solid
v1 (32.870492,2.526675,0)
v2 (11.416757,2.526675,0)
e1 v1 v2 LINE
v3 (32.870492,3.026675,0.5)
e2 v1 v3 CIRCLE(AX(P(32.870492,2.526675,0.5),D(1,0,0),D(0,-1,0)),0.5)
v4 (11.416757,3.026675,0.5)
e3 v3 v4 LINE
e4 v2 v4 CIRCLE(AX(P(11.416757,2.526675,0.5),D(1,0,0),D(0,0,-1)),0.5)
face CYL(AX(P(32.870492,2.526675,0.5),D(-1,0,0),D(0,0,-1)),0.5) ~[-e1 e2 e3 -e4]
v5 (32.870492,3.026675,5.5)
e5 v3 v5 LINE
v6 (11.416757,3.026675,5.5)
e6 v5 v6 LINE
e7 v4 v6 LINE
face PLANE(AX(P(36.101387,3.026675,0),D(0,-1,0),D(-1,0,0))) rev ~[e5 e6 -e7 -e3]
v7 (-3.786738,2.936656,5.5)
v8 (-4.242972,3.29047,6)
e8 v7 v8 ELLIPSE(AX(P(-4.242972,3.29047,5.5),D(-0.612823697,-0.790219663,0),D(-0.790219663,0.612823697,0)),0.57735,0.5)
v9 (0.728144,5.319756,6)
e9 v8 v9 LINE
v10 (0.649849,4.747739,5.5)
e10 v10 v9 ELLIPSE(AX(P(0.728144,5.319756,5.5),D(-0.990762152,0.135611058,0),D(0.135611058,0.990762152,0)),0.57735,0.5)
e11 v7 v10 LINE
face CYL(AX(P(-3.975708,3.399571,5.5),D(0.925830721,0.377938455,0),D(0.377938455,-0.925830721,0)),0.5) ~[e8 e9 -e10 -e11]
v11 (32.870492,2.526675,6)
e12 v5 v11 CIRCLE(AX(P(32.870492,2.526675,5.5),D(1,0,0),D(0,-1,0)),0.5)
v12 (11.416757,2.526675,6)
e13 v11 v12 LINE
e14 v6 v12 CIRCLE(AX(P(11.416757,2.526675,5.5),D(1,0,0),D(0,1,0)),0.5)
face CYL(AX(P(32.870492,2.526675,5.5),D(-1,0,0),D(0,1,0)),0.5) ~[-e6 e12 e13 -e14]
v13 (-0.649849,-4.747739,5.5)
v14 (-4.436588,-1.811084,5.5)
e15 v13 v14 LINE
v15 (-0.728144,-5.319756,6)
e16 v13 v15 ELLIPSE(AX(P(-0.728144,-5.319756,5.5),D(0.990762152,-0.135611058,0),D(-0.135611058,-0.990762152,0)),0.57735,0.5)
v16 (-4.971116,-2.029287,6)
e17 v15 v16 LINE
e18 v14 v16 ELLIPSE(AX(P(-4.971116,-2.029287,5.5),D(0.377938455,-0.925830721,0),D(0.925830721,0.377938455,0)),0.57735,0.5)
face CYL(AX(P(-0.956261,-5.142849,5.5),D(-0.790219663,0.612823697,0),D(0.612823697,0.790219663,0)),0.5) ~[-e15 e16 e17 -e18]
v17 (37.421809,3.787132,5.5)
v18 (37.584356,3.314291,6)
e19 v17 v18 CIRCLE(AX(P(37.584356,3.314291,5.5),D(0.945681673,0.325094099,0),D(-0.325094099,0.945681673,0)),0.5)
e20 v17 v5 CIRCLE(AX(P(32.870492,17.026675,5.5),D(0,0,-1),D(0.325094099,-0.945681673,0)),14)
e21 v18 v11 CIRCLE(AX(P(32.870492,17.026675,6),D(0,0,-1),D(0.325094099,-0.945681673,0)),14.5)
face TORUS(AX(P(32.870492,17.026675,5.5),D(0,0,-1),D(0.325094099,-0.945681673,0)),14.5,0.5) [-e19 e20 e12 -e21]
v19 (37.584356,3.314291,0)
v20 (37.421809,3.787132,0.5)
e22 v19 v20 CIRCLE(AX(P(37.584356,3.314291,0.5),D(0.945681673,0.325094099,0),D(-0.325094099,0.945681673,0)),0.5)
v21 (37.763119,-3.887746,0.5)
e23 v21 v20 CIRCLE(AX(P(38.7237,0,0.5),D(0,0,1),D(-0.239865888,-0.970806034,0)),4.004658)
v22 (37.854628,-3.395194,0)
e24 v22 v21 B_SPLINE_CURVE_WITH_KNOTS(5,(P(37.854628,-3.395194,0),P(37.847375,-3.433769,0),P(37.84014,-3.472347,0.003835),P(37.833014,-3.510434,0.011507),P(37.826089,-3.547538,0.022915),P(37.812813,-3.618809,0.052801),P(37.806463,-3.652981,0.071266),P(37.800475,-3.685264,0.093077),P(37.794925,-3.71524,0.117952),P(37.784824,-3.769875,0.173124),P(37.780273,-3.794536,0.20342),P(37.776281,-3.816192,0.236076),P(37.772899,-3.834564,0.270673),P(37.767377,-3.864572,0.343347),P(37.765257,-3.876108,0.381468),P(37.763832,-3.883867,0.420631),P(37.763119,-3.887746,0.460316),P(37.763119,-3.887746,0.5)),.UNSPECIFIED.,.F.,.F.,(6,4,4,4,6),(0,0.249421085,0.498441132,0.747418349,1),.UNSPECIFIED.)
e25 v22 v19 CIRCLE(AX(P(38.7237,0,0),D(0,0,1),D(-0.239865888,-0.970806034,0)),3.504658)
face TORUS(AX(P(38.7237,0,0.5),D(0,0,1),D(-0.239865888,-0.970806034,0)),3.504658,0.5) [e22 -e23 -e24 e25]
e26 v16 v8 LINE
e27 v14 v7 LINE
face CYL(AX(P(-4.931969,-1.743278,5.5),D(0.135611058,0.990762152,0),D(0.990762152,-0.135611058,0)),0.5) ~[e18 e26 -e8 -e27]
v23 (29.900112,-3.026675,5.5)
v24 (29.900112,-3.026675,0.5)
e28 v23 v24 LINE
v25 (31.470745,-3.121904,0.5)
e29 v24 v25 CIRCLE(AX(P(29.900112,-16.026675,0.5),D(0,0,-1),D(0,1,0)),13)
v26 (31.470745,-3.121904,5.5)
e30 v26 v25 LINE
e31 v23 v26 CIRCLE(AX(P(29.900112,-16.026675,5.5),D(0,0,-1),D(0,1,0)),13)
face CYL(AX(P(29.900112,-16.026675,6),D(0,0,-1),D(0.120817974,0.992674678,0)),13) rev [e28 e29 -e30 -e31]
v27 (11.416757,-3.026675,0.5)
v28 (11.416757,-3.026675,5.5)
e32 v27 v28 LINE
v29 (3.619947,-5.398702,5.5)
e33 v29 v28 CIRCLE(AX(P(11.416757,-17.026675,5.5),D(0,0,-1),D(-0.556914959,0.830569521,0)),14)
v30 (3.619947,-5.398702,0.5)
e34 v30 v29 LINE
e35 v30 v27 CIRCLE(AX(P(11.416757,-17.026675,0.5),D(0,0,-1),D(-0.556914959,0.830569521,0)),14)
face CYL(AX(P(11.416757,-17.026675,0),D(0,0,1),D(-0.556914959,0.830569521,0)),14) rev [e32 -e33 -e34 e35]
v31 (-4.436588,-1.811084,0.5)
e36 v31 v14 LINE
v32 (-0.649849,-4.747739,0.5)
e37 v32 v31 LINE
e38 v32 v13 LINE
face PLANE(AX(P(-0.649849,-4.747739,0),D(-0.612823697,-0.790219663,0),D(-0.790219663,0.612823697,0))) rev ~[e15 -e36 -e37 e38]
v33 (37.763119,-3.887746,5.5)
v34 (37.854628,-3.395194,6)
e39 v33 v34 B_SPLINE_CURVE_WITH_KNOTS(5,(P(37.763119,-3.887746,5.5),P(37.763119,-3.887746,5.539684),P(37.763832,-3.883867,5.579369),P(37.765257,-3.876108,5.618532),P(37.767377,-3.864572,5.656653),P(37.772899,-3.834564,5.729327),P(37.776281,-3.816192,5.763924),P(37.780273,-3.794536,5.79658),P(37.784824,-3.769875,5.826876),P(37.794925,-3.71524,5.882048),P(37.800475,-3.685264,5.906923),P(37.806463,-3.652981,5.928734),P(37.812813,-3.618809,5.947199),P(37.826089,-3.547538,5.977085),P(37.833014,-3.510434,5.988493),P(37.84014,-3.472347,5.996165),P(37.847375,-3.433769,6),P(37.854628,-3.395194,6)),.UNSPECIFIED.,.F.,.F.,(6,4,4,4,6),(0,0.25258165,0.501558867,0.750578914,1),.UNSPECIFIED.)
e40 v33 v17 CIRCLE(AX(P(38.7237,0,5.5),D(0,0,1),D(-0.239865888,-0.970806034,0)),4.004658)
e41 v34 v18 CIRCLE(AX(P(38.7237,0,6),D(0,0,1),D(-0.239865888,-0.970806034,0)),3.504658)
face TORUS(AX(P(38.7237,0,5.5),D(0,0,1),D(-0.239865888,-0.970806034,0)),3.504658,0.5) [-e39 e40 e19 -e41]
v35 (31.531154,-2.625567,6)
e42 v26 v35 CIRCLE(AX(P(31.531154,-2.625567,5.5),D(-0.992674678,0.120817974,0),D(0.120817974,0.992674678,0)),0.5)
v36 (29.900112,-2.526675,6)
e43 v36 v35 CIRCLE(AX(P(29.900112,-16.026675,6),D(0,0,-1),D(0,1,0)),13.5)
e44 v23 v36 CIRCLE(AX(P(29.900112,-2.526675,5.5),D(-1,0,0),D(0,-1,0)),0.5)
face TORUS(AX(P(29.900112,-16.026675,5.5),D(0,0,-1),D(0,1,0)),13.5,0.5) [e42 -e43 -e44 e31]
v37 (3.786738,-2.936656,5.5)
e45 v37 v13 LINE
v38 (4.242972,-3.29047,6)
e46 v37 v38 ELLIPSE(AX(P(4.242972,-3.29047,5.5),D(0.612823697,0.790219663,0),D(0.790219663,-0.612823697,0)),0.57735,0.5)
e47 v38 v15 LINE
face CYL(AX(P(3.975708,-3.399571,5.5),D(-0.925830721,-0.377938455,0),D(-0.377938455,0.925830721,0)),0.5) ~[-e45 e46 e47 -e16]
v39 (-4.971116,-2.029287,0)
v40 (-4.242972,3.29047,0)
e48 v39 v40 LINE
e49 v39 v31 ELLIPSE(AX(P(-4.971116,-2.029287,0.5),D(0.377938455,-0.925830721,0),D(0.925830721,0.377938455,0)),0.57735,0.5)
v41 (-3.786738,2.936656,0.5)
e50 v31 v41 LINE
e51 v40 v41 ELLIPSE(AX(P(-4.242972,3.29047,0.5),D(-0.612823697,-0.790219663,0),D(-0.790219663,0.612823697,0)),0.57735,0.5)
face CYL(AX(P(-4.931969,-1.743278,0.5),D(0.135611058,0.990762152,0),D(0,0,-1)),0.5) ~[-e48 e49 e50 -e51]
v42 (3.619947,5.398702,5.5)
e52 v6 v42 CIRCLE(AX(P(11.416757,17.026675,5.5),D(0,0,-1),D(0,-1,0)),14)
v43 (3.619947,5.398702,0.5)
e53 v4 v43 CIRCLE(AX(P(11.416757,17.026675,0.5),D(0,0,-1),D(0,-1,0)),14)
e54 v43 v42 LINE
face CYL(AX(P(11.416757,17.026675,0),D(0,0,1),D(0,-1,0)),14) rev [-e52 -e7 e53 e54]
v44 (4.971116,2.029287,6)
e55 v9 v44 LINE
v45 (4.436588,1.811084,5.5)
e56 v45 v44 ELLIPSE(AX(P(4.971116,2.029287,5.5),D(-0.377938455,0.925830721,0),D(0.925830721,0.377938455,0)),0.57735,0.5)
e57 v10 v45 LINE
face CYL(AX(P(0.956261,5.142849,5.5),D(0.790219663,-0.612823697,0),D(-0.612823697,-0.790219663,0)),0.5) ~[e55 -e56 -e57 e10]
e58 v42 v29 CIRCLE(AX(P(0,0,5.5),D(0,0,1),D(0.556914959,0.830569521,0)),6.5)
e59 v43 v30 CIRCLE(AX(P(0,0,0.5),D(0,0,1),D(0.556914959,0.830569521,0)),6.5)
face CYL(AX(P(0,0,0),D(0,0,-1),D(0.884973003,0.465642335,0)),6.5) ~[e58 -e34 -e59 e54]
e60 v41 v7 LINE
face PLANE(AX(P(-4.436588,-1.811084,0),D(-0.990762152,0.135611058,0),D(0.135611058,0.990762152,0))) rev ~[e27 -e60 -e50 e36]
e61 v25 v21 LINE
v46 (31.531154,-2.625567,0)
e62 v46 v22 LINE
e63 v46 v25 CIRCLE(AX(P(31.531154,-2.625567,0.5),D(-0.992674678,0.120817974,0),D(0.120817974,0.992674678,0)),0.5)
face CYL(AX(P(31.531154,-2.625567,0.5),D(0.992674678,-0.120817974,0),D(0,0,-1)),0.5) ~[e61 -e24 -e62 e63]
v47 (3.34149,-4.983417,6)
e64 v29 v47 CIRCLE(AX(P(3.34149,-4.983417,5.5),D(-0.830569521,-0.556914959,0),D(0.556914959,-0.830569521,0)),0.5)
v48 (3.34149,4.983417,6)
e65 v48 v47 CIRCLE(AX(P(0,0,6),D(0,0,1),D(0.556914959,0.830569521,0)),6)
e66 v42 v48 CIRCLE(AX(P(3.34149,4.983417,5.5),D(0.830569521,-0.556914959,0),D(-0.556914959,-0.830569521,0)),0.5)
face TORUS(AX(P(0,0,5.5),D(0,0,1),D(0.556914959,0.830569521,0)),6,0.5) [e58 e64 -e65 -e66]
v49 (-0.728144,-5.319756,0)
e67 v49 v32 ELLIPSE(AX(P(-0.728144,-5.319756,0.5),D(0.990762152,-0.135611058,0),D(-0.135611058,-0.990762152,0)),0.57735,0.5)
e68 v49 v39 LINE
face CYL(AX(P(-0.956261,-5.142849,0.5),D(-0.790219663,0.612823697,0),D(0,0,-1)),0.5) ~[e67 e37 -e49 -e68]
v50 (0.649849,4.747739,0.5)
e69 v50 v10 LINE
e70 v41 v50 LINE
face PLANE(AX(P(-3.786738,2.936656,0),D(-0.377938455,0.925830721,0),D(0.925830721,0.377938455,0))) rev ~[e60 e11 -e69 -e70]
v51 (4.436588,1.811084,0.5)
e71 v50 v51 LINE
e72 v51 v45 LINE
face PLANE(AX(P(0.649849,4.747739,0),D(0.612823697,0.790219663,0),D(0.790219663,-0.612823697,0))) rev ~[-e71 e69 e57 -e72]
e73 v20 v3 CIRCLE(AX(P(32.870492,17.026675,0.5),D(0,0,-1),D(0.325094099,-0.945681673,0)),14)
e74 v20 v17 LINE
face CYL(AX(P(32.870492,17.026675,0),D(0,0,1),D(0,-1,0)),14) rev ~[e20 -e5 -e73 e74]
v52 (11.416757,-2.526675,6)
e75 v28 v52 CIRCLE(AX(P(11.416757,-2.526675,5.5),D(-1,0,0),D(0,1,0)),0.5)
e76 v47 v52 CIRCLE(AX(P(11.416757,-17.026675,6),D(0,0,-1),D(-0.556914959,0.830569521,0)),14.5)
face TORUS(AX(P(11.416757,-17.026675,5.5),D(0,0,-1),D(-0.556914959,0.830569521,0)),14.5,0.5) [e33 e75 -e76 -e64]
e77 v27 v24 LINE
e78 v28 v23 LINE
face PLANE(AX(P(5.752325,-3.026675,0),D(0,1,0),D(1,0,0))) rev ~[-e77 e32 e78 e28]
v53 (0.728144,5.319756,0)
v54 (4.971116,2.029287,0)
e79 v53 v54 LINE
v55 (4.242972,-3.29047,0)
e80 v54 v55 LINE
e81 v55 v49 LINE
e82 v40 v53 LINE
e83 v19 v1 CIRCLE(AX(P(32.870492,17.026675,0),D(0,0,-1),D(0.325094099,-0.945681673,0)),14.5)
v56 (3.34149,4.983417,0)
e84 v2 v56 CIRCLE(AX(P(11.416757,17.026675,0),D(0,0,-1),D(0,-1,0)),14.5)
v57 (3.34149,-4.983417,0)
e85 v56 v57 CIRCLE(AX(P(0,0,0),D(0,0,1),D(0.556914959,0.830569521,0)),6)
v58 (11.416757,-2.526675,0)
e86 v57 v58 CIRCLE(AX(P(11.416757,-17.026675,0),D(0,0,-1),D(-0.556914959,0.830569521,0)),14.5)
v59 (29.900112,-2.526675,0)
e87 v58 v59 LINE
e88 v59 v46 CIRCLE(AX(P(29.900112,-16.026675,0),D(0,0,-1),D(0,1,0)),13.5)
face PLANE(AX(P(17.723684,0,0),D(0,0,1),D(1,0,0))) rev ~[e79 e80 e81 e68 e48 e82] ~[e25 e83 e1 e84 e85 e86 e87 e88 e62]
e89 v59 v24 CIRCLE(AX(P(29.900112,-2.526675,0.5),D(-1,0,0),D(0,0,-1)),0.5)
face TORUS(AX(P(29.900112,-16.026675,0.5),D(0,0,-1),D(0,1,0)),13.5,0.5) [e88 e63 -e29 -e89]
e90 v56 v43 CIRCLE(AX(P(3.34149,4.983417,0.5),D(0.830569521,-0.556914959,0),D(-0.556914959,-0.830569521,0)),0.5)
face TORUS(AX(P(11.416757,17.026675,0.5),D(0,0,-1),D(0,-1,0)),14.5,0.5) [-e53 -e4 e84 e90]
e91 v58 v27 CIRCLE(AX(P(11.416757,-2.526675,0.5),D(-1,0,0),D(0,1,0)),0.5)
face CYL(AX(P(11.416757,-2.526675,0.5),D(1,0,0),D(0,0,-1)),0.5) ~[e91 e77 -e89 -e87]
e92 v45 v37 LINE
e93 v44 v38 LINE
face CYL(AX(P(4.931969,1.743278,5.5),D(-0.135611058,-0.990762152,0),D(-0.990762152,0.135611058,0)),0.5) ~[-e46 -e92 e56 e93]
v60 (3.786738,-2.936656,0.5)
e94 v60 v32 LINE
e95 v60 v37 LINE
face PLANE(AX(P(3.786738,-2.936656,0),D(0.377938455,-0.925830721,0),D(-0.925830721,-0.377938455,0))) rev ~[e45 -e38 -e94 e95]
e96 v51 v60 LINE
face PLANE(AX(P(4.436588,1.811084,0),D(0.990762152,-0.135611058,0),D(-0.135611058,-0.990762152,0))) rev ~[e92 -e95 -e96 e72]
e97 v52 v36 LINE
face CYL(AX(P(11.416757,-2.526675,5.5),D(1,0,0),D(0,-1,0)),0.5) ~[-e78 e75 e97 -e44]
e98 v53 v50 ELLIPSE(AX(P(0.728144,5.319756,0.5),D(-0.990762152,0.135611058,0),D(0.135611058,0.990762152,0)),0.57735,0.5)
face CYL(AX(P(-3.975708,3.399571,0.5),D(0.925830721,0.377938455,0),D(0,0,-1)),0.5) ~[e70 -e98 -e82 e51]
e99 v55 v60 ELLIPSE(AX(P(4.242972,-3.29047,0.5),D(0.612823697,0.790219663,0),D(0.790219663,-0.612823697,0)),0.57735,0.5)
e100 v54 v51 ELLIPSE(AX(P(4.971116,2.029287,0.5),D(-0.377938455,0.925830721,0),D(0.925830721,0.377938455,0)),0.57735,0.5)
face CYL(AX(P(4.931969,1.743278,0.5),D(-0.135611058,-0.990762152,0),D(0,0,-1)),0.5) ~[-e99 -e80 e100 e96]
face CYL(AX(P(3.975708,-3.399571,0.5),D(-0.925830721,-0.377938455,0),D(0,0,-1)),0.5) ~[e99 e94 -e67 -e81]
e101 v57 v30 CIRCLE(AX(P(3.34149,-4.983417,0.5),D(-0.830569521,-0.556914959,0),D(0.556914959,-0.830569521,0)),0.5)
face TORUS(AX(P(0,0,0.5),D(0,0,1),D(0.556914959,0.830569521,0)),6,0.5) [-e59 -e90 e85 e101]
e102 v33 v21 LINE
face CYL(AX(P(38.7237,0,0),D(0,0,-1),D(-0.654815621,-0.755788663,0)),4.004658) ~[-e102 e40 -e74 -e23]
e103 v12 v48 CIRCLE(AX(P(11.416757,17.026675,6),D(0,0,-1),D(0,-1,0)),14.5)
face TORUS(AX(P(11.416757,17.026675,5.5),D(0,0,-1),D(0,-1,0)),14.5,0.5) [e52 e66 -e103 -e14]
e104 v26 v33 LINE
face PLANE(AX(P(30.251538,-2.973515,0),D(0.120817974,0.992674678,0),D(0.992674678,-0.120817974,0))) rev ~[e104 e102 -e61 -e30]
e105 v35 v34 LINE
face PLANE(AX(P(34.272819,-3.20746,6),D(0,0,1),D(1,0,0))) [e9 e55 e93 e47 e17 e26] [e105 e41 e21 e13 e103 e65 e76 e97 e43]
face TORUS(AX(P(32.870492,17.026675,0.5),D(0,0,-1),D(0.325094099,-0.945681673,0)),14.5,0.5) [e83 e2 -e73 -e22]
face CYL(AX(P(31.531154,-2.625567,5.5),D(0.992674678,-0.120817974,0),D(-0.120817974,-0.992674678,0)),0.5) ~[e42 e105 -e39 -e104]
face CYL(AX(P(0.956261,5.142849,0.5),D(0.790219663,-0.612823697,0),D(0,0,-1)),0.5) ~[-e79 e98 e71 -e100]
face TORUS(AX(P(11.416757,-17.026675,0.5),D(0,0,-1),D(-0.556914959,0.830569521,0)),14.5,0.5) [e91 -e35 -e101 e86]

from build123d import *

# Parameters (mm, degrees)
F1_DEPTH    = 6
F2_R        = 14
F3_T1_DEPTH = 6
F4_R        = 13
F5_R        = 0.5


# Not quite as in the source:
# - a fillet or chamfer that OpenCascade refuses, or shapes differently, is made with other operations: its cross-section is extruded or revolved along the edge and cut away or added


with BuildPart() as f1:
    # F0 (on Top) → F1 (new body)
    with BuildSketch(Plane.XY):
        with BuildLine():
            Line((36.1013870801, 3.026675175), (5.7523245202, 3.026675175))
            ThreePointArc((5.7523245202, 3.026675175), (-6.5, 0), (5.7523245202, -3.026675175))
            Line((5.7523245202, -3.026675175), (36.1013870801, -3.026675175))
            ThreePointArc((36.1013870801, -3.026675175), (42.7283578295, 0), (36.1013870801, 3.026675175))
        make_face()
        Polygon((-3.7867383436, 2.9366555893), (0.6498491707, 4.7477393977), (4.4365875143, 1.8110838084), (3.7867383436, -2.9366555893), (-0.6498491707, -4.7477393977), (-4.4365875143, -1.8110838084), align=None, mode=Mode.SUBTRACT)
    extrude(amount=F1_DEPTH)

    # F2
    f2_edges = [f1.edges().sort_by_distance(p)[0] for p in [
        (5.752325, -3.026675, 3),
        (5.752325, 3.026675, 3),
        (36.101387, 3.026675, 3),
    ]]
    fillet(f2_edges, radius=F2_R)

    # F3: chamfer of 11 on 1 edges, made by hand

    # F3_s2 → F3_t1 (join)
    with BuildSketch(Plane.XY):
        with BuildLine():
            Line((30.2515384912, -2.9735152662), (38.1998957411, -3.9409061384))
            Line((38.1998957411, -3.9409061384), (38.2526662364, -3.7273288109))
            ThreePointArc((38.2526662364, -3.7273288109), (37.1662038799, -3.4493250658), (36.2454465167, -2.8604016692))
            Line((36.2454465167, -2.8604016692), (36.1013870801, -2.806675175))
            ThreePointArc((36.1013870801, -2.806675175), (33.1764627857, -2.806675175), (30.2515384912, -2.7535152662))
            Line((30.2515384912, -2.7535152662), (30.2515384912, -2.9735152662))
        make_face()
    extrude(amount=F3_T1_DEPTH)

    # F4
    f4_edges = [f1.edges().sort_by_distance(p)[0] for p in [
        (30.688315, -3.026675, 3),
    ]]
    fillet(f4_edges, radius=F4_R)

    # F5
    f5_edges = [f1.edges().sort_by_distance(p)[0] for p in [
        (20.658434, -3.026675, 0),
        (30.686871, -3.050504, 0),
        (7.341933, -3.632803, 0),
        (34.616932, -3.504825, 0),
        (-6.5, 0, 0),
        (42.724404, 0.177915, 0),
        (7.341933, 3.632803, 0),
        (35.177697, 3.218098, 0),
        (22.143624, 3.026675, 0),
        (-4.111663, 0.562786, 0),
        (-1.568445, 3.842197, 0),
        (2.543218, 3.279412, 0),
        (4.111663, -0.562786, 0),
        (1.568445, -3.842197, 0),
        (-2.543218, -3.279412, 0),
        (20.658434, -3.026675, 6),
        (30.686871, -3.050504, 6),
        (7.341933, -3.632803, 6),
        (34.616932, -3.504825, 6),
        (-6.5, 0, 6),
        (42.724404, 0.177915, 6),
        (7.341933, 3.632803, 6),
        (35.177697, 3.218098, 6),
        (22.143624, 3.026675, 6),
        (-4.111663, 0.562786, 6),
        (-1.568445, 3.842197, 6),
        (2.543218, 3.279412, 6),
        (4.111663, -0.562786, 6),
        (1.568445, -3.842197, 6),
        (-2.543218, -3.279412, 6),
    ]]
    fillet(f5_edges, radius=F5_R)


solid = f1.part
